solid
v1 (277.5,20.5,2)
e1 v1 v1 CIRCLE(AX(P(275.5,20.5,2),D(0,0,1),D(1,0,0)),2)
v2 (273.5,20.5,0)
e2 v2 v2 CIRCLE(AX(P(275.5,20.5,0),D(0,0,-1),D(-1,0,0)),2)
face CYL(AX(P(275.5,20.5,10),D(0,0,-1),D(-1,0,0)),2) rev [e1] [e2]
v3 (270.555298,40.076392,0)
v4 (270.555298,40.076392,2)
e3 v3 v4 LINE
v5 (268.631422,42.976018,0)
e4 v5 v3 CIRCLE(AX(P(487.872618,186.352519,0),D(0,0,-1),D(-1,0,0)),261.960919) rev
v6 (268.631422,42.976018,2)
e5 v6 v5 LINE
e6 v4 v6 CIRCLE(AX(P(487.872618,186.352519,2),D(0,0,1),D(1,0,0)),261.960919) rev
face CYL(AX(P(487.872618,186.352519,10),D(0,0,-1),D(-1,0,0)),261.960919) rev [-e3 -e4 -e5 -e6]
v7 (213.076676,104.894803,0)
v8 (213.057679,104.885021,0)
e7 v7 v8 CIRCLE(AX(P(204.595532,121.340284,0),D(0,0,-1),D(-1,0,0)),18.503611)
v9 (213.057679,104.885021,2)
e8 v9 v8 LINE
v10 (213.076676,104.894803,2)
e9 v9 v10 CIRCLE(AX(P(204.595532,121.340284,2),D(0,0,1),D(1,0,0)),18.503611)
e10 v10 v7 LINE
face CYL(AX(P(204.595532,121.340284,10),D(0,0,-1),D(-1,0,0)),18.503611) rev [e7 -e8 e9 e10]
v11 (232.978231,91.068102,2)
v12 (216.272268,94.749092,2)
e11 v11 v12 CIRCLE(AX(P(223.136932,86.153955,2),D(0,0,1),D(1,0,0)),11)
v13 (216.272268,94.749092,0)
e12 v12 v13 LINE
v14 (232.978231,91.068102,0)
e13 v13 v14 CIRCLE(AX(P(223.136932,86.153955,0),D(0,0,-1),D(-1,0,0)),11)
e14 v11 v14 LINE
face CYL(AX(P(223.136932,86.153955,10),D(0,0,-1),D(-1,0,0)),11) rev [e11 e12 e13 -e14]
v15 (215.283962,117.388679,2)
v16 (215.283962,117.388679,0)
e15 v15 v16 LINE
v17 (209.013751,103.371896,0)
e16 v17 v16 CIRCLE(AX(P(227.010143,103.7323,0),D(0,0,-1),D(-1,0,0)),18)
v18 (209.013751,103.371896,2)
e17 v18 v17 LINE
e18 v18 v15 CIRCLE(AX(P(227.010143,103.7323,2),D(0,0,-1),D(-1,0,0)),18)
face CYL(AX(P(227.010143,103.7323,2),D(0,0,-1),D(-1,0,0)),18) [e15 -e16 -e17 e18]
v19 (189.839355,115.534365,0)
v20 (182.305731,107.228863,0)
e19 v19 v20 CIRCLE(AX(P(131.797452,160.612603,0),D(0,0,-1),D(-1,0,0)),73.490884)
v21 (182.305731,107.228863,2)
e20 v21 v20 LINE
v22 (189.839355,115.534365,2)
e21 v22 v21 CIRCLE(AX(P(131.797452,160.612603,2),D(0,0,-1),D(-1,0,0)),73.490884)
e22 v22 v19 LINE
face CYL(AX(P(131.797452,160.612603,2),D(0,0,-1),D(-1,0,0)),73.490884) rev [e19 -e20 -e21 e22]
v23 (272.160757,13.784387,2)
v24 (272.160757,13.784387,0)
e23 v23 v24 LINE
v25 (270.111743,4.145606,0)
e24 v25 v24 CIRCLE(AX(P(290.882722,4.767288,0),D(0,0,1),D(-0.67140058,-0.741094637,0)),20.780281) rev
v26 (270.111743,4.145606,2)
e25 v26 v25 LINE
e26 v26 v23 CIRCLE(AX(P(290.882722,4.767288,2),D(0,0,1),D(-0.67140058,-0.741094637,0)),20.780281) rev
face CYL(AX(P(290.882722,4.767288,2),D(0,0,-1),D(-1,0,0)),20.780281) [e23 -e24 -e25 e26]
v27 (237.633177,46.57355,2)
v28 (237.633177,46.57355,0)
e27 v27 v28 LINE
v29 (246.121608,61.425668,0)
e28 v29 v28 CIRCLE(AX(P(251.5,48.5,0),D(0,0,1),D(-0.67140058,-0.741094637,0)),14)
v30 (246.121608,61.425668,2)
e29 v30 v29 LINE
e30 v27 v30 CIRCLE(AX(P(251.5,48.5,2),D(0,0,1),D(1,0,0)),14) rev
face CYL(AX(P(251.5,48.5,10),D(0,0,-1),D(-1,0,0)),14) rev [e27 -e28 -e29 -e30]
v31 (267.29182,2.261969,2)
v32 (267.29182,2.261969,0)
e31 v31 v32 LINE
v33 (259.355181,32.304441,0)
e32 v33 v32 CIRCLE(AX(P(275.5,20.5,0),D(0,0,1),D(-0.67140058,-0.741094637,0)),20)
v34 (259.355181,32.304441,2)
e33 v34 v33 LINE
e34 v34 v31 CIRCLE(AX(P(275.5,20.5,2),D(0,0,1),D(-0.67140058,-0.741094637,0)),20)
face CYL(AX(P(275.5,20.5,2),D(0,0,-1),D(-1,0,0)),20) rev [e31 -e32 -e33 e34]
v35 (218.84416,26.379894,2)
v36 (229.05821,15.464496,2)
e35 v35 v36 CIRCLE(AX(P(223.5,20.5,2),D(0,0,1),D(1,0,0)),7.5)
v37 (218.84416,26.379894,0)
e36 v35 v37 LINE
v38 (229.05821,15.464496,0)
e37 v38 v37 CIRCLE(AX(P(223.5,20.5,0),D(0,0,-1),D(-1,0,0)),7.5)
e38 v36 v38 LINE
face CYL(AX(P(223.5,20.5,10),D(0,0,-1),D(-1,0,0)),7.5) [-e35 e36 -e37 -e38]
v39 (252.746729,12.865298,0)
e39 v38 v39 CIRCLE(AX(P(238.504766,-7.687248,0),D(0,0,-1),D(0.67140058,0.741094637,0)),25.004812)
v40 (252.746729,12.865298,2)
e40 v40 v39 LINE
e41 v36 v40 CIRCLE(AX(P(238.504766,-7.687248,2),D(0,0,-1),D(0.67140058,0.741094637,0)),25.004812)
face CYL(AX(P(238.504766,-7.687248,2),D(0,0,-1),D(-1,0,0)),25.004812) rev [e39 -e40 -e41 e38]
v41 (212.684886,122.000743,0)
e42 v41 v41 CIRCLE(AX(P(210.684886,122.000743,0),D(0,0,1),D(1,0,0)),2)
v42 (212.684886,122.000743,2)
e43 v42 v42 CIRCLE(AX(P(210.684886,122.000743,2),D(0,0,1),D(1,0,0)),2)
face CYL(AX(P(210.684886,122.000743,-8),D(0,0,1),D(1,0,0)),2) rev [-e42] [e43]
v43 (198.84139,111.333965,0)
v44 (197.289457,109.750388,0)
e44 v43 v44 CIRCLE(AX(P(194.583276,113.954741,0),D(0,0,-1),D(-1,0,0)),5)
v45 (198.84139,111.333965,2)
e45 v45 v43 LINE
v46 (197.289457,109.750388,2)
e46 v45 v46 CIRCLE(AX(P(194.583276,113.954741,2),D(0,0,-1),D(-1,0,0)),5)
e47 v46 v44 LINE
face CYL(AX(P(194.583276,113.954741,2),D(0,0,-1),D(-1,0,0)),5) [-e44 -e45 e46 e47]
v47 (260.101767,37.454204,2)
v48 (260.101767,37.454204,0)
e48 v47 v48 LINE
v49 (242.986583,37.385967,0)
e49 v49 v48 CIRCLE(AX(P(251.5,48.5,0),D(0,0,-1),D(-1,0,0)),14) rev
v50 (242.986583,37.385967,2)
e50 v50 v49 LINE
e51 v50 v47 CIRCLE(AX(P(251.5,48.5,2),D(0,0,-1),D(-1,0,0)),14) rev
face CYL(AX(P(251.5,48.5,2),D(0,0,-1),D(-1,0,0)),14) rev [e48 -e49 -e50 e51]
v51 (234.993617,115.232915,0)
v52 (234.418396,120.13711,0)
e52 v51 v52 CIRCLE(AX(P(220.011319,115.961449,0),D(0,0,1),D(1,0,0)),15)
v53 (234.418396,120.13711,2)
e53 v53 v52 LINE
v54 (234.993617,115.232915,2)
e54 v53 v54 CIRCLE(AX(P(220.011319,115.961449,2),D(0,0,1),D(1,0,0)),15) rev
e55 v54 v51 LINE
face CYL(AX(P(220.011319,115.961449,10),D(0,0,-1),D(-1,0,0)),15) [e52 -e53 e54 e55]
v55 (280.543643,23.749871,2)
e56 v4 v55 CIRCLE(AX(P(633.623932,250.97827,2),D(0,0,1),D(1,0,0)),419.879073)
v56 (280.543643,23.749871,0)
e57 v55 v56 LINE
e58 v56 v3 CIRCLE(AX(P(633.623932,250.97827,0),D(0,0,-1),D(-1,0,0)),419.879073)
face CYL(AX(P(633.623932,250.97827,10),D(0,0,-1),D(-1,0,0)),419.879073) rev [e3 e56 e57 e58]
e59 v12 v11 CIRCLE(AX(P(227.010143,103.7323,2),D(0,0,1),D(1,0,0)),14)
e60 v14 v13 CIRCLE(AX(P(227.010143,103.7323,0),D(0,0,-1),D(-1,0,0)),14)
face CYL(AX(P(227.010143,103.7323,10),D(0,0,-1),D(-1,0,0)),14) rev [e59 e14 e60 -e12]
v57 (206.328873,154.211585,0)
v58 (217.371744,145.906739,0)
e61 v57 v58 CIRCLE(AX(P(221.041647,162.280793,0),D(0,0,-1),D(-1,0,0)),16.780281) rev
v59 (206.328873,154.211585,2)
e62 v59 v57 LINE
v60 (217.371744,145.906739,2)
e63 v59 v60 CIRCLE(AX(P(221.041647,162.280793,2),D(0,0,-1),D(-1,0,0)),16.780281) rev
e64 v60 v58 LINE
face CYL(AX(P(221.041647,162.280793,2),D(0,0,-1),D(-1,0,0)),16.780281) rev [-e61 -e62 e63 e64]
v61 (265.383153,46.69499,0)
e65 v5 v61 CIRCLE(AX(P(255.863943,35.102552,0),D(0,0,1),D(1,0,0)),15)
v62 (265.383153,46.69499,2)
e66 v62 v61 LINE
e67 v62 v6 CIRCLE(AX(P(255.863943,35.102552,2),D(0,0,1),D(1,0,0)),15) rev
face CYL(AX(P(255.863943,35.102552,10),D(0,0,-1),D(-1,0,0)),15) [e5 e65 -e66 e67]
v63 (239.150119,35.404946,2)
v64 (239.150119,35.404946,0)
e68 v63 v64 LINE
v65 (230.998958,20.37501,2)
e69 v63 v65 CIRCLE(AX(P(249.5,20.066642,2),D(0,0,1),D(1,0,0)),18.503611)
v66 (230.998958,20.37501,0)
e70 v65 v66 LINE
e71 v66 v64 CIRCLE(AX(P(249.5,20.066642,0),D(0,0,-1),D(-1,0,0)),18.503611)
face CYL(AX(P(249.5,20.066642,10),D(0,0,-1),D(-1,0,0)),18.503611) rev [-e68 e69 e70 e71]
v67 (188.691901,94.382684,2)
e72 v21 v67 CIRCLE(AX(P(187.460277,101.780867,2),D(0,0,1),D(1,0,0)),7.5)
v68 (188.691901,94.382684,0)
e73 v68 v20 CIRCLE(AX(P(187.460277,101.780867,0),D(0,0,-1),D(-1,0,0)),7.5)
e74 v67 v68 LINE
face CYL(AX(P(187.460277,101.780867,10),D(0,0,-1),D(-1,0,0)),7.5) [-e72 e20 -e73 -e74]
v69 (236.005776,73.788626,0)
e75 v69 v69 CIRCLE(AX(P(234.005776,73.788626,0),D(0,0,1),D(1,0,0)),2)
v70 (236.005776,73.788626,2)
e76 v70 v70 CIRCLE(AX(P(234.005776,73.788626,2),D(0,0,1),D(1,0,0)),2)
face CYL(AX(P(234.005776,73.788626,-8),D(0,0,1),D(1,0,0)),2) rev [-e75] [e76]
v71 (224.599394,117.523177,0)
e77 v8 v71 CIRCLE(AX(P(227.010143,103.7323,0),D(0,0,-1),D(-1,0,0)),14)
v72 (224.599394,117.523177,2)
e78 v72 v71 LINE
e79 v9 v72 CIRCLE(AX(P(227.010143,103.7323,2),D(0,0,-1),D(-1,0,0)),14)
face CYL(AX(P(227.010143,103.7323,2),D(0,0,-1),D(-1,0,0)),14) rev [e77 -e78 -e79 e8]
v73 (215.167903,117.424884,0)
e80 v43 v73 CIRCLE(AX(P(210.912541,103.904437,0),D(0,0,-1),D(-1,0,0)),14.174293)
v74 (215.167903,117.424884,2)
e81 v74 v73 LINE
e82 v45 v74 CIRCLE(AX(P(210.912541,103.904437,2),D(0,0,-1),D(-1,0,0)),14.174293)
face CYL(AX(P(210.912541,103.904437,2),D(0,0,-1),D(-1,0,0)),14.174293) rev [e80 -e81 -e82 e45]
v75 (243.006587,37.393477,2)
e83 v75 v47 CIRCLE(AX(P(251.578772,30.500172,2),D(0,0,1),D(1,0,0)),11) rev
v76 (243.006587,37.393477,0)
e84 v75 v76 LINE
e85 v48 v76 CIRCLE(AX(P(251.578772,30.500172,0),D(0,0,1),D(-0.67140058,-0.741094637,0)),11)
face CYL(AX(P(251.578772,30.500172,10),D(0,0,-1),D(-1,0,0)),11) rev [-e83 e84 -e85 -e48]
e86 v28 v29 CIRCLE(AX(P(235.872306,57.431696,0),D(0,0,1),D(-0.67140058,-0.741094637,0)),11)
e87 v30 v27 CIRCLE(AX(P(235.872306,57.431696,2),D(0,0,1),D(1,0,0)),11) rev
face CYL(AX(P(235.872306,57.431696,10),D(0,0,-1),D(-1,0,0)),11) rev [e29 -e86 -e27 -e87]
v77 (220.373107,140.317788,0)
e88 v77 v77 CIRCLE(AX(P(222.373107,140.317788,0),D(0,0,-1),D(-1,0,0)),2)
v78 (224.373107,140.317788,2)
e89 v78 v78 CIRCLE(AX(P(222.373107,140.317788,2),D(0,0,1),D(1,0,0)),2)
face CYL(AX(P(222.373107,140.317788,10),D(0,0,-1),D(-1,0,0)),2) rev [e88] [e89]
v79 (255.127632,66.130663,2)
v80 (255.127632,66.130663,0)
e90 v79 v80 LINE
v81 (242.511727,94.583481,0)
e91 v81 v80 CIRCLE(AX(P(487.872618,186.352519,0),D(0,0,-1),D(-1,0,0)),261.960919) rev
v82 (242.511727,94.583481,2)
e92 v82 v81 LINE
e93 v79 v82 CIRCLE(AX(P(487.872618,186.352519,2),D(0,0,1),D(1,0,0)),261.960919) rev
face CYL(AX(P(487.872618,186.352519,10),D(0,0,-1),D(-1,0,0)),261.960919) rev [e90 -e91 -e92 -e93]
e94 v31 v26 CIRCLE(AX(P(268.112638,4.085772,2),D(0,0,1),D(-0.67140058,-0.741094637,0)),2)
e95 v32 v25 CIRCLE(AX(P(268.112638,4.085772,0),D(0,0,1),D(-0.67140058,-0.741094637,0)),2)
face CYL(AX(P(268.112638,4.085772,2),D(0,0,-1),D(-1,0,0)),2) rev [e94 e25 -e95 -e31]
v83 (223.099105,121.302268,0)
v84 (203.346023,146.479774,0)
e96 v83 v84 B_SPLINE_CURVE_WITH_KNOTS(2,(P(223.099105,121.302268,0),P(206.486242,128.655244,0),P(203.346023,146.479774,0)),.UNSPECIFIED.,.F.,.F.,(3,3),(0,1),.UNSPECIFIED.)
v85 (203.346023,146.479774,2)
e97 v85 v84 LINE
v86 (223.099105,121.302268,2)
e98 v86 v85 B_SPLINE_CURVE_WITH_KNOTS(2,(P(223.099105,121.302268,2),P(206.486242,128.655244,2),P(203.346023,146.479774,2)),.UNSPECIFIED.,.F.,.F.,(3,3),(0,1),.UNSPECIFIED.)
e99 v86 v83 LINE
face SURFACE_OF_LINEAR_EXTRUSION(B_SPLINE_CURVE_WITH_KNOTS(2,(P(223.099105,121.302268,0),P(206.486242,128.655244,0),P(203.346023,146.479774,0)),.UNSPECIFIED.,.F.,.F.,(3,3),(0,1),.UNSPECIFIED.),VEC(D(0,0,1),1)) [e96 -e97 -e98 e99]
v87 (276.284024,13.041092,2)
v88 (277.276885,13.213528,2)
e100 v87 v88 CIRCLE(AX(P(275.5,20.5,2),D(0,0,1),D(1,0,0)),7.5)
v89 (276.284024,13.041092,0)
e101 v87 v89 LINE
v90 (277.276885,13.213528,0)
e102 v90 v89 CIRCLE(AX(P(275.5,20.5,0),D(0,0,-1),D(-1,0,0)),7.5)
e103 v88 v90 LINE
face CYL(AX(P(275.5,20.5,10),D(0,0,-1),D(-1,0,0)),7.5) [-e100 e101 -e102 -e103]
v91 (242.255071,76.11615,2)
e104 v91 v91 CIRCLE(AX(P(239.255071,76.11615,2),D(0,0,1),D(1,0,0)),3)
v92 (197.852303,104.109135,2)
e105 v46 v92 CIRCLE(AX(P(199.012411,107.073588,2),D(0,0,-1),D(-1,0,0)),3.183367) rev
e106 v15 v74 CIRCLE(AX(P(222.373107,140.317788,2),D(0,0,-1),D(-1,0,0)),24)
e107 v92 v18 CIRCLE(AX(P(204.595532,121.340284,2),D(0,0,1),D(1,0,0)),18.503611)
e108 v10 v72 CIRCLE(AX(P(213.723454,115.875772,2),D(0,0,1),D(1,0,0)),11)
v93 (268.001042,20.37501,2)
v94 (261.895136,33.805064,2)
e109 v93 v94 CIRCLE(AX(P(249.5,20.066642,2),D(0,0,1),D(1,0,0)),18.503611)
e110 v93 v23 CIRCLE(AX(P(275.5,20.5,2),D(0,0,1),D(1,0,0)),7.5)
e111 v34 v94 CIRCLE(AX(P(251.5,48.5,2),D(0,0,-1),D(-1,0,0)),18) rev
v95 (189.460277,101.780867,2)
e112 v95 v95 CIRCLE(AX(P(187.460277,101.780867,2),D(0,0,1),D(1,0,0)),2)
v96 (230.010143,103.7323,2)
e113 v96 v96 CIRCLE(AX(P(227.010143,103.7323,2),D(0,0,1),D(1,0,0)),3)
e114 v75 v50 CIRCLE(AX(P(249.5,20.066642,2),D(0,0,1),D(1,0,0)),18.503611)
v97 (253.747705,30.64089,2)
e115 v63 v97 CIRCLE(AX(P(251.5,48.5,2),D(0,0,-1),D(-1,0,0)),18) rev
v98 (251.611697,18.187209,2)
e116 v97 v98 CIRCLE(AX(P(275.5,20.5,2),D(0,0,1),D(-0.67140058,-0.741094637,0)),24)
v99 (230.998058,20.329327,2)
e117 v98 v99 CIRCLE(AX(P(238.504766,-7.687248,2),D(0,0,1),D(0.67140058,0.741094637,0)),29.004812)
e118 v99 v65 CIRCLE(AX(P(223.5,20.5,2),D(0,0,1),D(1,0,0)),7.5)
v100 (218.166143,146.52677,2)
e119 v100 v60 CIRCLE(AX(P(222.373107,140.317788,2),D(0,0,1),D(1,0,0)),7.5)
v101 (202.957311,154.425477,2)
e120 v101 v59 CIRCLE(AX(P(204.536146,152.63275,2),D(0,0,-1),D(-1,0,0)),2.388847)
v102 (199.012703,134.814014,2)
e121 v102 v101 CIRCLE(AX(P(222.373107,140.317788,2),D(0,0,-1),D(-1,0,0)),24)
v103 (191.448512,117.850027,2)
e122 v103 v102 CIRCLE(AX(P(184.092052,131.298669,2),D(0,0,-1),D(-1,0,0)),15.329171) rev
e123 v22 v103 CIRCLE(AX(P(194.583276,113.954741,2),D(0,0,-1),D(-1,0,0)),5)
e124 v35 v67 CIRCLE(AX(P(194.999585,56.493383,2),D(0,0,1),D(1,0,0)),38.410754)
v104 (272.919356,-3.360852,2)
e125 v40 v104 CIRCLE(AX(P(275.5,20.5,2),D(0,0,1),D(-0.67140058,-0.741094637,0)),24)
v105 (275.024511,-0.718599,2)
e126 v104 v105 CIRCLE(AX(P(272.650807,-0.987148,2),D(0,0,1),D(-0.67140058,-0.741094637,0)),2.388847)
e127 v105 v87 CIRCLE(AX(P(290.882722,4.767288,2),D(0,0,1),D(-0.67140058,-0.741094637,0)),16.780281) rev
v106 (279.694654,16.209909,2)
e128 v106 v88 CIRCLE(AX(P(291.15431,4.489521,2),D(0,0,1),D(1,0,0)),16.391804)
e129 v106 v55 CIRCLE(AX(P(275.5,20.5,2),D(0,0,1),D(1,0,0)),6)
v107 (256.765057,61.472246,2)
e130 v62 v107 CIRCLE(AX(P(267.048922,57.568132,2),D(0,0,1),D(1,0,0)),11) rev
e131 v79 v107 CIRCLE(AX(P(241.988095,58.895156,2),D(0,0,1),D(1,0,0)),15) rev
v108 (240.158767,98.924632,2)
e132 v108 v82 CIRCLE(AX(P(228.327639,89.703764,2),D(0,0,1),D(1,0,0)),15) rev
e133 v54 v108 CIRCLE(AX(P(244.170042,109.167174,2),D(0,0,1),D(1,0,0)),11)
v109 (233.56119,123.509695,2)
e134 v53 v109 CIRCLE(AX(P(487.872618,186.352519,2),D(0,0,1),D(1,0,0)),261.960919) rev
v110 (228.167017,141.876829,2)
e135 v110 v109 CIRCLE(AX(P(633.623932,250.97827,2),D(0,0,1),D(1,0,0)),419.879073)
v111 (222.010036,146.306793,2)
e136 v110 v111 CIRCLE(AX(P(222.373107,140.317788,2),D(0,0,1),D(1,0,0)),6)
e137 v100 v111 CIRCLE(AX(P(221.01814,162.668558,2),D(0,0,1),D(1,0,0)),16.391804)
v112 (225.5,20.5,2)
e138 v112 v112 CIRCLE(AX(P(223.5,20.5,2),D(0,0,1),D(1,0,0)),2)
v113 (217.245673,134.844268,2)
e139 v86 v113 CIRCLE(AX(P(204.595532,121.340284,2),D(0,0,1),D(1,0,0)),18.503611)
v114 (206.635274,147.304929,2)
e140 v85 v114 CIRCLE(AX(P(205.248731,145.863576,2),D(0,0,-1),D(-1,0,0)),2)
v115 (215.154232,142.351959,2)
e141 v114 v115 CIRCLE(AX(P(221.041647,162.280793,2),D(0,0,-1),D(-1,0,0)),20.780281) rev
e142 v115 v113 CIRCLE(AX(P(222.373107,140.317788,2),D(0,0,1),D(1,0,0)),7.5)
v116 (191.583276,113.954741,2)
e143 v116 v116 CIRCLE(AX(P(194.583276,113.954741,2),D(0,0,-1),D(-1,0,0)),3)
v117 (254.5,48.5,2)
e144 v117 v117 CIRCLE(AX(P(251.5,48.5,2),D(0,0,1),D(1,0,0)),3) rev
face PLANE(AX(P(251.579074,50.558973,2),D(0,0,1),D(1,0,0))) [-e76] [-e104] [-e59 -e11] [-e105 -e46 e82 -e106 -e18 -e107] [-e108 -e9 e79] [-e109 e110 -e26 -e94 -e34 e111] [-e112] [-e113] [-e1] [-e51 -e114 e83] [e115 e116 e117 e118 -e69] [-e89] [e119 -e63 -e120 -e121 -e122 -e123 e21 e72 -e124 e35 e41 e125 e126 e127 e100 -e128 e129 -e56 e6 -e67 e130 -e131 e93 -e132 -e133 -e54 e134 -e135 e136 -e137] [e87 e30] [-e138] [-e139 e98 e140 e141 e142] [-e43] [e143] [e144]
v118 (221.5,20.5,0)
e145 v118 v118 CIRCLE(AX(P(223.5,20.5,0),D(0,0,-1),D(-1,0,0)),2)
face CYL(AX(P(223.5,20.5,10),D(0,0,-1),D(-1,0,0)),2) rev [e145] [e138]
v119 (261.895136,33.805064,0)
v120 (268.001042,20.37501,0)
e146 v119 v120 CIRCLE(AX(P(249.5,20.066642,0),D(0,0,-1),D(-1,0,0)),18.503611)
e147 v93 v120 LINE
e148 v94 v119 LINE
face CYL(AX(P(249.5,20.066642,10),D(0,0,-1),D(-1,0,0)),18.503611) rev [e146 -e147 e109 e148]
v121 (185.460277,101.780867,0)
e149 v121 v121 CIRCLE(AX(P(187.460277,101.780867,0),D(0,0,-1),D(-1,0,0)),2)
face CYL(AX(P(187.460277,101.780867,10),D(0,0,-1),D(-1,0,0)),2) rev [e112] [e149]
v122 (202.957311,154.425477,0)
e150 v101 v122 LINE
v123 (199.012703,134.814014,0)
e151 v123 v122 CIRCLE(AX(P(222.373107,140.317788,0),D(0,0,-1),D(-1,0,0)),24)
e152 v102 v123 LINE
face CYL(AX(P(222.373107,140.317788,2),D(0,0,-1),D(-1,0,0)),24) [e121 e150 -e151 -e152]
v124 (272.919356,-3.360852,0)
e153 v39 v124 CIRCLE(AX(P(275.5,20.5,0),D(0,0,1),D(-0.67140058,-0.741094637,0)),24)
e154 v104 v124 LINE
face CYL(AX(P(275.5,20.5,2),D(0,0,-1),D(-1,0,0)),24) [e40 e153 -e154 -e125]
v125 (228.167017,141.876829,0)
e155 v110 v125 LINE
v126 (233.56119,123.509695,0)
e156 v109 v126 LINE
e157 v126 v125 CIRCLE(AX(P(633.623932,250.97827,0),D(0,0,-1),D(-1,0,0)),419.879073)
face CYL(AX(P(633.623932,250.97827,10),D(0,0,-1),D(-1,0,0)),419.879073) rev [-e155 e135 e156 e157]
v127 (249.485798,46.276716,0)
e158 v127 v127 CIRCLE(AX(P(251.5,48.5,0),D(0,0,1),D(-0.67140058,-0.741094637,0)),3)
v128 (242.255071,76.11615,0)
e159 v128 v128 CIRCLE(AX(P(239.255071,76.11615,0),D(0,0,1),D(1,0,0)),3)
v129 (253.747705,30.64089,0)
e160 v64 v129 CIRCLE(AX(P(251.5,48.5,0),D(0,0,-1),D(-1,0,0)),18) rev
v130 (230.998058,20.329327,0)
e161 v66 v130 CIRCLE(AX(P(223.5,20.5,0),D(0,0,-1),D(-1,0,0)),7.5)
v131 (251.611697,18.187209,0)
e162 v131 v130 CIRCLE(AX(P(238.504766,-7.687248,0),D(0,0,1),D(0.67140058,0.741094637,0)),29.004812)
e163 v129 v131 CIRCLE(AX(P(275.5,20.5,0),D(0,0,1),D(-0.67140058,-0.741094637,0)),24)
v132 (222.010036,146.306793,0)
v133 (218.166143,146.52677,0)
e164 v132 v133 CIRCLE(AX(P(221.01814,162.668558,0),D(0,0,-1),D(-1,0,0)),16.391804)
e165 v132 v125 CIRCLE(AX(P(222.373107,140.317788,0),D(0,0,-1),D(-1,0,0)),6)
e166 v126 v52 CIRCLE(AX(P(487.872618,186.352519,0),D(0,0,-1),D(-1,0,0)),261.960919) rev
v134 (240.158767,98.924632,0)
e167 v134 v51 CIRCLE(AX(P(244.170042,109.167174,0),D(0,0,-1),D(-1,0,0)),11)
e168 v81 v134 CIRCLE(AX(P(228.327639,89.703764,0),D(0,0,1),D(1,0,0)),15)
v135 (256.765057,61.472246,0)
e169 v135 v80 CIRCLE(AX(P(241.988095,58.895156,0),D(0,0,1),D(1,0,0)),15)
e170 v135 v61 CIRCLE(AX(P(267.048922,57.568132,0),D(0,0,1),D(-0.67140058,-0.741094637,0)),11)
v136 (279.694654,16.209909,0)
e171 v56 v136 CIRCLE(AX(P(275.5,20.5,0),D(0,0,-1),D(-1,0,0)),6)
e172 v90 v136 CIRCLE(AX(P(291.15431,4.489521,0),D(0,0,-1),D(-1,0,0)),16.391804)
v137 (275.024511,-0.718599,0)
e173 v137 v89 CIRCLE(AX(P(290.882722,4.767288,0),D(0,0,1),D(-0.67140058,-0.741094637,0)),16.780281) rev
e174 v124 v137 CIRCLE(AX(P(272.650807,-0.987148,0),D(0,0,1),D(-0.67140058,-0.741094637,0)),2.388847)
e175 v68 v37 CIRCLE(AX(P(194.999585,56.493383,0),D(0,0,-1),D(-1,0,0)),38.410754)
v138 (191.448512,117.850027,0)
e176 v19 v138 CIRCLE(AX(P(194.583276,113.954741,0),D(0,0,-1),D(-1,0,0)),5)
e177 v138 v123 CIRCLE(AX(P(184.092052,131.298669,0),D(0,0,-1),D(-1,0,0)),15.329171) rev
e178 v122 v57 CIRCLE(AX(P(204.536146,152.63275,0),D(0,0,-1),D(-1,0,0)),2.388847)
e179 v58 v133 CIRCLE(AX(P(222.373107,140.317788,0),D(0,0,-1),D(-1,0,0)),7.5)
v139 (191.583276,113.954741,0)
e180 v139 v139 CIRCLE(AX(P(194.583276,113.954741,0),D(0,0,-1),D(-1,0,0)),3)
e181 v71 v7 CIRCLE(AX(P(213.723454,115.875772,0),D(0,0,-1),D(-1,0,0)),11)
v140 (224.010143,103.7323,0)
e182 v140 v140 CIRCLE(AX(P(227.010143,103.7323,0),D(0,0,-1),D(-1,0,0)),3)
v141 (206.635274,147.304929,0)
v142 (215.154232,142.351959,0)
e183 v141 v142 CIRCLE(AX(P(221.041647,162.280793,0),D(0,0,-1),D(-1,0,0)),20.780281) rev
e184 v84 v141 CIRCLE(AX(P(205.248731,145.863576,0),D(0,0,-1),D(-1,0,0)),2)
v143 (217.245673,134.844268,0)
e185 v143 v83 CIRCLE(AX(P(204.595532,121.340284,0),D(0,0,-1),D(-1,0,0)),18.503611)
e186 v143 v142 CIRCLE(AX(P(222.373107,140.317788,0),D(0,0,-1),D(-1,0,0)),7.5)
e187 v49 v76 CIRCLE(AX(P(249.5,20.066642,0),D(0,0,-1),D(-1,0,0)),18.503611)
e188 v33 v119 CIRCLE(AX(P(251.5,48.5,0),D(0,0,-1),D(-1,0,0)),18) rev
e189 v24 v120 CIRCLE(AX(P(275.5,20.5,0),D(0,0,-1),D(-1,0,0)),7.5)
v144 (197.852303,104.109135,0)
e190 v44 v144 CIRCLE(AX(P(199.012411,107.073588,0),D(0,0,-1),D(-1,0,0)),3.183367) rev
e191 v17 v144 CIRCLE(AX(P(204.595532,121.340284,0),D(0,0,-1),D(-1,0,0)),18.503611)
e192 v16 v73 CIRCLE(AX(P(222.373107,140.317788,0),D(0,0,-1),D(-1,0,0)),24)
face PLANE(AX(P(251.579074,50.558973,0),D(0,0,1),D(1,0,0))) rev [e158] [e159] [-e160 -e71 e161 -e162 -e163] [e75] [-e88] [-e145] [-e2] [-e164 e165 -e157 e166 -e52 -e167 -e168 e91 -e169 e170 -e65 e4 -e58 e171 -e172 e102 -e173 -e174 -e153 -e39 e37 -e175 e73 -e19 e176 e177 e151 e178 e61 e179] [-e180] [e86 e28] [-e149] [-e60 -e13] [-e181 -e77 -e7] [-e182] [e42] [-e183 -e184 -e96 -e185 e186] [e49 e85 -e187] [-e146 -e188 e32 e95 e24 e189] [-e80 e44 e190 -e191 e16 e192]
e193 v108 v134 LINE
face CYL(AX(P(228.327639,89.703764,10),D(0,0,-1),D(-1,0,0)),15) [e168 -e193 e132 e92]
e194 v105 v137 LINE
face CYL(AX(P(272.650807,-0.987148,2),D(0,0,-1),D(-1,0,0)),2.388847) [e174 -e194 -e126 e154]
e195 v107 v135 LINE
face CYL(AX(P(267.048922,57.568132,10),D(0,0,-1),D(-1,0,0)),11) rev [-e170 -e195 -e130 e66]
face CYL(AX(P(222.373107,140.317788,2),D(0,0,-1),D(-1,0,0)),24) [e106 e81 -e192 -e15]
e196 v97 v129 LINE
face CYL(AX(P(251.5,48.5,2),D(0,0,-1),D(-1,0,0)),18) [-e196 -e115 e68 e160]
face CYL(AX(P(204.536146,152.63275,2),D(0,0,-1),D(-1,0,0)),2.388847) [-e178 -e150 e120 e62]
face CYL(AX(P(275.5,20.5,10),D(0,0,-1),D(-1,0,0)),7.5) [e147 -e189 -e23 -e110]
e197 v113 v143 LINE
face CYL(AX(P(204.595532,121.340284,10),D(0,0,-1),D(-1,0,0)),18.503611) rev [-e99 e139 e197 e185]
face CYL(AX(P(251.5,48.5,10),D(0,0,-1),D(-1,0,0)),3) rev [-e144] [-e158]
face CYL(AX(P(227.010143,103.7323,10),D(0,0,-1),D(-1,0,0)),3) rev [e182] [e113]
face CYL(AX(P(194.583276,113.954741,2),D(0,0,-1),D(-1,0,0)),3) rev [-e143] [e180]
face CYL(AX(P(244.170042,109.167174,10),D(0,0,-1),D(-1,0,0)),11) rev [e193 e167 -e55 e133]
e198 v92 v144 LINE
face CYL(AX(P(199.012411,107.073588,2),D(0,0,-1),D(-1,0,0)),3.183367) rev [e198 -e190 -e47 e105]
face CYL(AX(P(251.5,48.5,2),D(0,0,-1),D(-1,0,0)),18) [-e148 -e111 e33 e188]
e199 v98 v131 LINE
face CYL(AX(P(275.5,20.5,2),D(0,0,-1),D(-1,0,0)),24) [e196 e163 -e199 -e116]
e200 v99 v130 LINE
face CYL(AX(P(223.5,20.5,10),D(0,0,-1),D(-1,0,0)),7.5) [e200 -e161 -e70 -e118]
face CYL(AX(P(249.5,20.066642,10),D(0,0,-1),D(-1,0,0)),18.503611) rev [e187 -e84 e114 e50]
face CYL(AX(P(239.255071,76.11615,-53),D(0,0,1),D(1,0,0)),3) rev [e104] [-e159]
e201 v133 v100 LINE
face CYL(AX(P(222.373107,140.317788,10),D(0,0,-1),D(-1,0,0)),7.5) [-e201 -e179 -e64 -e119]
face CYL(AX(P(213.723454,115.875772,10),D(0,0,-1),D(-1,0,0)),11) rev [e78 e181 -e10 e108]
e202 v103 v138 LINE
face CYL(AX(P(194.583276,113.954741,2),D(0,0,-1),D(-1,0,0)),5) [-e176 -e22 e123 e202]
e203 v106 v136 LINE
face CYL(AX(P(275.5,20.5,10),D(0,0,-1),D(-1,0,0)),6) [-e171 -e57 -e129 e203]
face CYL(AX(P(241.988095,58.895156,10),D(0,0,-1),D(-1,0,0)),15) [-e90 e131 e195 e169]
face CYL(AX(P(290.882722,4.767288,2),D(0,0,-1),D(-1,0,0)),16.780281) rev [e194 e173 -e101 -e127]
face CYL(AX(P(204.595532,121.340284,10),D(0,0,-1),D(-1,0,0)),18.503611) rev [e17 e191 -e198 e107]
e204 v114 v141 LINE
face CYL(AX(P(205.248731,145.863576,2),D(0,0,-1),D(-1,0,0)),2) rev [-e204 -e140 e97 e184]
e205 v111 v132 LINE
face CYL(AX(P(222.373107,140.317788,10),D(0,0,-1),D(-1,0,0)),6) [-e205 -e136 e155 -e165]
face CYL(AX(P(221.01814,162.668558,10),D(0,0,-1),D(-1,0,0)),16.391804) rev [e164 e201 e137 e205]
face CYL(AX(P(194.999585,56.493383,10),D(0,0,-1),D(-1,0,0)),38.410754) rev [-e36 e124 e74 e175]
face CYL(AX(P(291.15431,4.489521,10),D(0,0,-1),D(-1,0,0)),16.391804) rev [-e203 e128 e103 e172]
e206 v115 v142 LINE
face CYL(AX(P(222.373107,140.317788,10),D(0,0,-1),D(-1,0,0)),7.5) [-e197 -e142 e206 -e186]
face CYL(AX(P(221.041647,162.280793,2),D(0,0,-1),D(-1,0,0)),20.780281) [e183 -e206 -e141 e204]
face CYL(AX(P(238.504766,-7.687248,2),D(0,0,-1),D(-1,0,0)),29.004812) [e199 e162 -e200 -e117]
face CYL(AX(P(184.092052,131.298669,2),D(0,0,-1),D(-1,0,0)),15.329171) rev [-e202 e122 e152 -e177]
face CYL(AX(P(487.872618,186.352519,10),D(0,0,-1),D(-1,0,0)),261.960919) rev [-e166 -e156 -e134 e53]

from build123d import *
from build123d.topology import SkipClean

# Parameters (mm, degrees)
SKETCH1_R            = 1.8
SKETCH1_R_2          = 2.75
EXTRUDE2_DEPTH       = 2
EXTRUDE3_START       = -2
EXTRUDE3_DEPTH       = 2
EXTRUDE4_DEPTH       = 2
EXTRUDE5_DEPTH       = 10
SKETCH5_R            = 3
EXTRUDE6_DEPTH       = 55
BOSS_EXTRUDE2_DEPTH  = 2
CUT_EXTRUDE2_DEPTH   = 10
BOSS_EXTRUDE3_DEPTH  = 2
CUT_EXTRUDE3_DEPTH   = 10
BOSS_EXTRUDE4_DEPTH  = 2
BOSS_EXTRUDE5_DEPTH  = 2
SKETCH11_R           = 3
CUT_EXTRUDE4_DEPTH   = 10
BOSS_EXTRUDE6_DEPTH  = 2
BOSS_EXTRUDE7_DEPTH  = 2
SKETCH16_R           = 3
SKETCH16_R_2         = 2
BOSS_EXTRUDE8_DEPTH  = 2
SKETCH16_3_R         = 2
CUT_EXTRUDE5_DEPTH   = 2
SKETCH17_R           = 2
CUT_EXTRUDE6_DEPTH   = 10
CUT_EXTRUDE7_DEPTH   = 10
CUT_EXTRUDE8_START   = -2
CUT_EXTRUDE8_DEPTH   = 2
BOSS_EXTRUDE9_DEPTH  = 2
SKETCH16_4_R         = 3
CUT_EXTRUDE9_DEPTH   = 2
SKETCH22_R           = 2
CUT_EXTRUDE11_DEPTH  = 10
SKETCH22_3_R         = 2
BOSS_EXTRUDE10_DEPTH = 2


# Read off the part's stored shape, not the designer's step: Cut-Extrude8
with BuildPart() as part:
    # Sketch1 → Extrude2 (new body)
    with BuildSketch(Plane.XY):
        with BuildLine():
            Line((214.950942091, 33.616874637), (221.807190432, 36.656917184))
            Line((221.807190432, 36.656917184), (220.185834407, 40.313582966))
            Line((220.185834407, 40.313582966), (249.033490074, 53.104557885))
            ThreePointArc((249.033490074, 53.104557885), (251.717229956, 54.156321533), (254.312398254, 52.901822418))
            Line((254.312398254, 52.901822418), (279.296283012, 23.753956867))
            ThreePointArc((279.296283012, 23.753956867), (280.042564492, 18.410715952), (275.5, 15.5))
            Line((275.5, 15.5), (223.5, 15.5))
            ThreePointArc((223.5, 15.5), (220.722148835, 16.342651938), (218.880602337, 18.586582838))
            Line((218.880602337, 18.586582838), (211.044169952, 36.260192904))
            Line((211.044169952, 36.260192904), (213.329586066, 37.27354042))
            Line((213.329586066, 37.27354042), (214.950942091, 33.616874637))
        make_face()
        with Locations((275.5, 20.5)):
            Circle(SKETCH1_R, mode=Mode.SUBTRACT)
        with Locations((251.5, 48.5)):
            Circle(SKETCH1_R_2, mode=Mode.SUBTRACT)
        with Locations((223.5, 20.5)):
            Circle(SKETCH1_R, mode=Mode.SUBTRACT)
    extrude(amount=EXTRUDE2_DEPTH)

    # Sketch2 → Extrude3 (add)
    with BuildSketch(Plane.XY.offset(2).offset(EXTRUDE3_START)):
        with BuildLine():
            Line((275.035821138, 64.633923334), (251.401662381, 54.15459928))
            ThreePointArc((251.401662381, 54.15459928), (253.0022869, 53.865703947), (254.312398254, 52.901822418))
            Line((254.312398254, 52.901822418), (265.867761021, 39.420565857))
            Line((265.867761021, 39.420565857), (282.872253523, 46.960313268))
            Line((282.872253523, 46.960313268), (275.035821138, 64.633923334))
        make_face()
        with BuildLine():
            Line((264.774418622, 15.5), (268.520870849, 7.050576522))
            Line((268.520870849, 7.050576522), (295.302771445, 18.925601058))
            Line((295.302771445, 18.925601058), (282.872253523, 46.960313268))
            Line((282.872253523, 46.960313268), (265.867761021, 39.420565857))
            Line((265.867761021, 39.420565857), (279.296283012, 23.753956867))
            ThreePointArc((279.296283012, 23.753956867), (280.042564492, 18.410715952), (275.5, 15.5))
            Line((275.5, 15.5), (264.774418622, 15.5))
        make_face()
        with BuildLine():
            ThreePointArc((223.5, 15.5), (222.085748932, 15.704179537), (220.787002315, 16.300042433))
            ThreePointArc((220.787002315, 16.300042433), (243.759401886, 7.058869787), (268.520870849, 7.050576522))
            Line((268.520870849, 7.050576522), (264.774418622, 15.5))
            Line((264.774418622, 15.5), (223.5, 15.5))
        make_face()
        with BuildLine():
            Line((295.302771445, 18.925601058), (268.520870849, 7.050576522))
            ThreePointArc((268.520870849, 7.050576522), (282.58749462, 11.46423343), (295.302771445, 18.925601058))
        make_face()
    extrude(amount=EXTRUDE3_DEPTH)


with BuildPart() as body_2:
    # Mirror2: mirrored copy
    add(part.part.mirror(Plane(origin=(11.104903497, -25.045036387, 0), x_dir=(0, 0, 1), z_dir=(-0.4053390061385553, 0.9141664455134023, 0))))


with BuildPart() as part_1:
    add(part.part)

    add(body_2.part)  # Extrude4 merges body 2
    # Sketch3 → Extrude4 (add)
    with BuildSketch(Plane.XY.offset(2)):
        Polygon((275.035821138, 64.633923334), (254.768870831, 110.34224561), (190.777219645, 81.96851518), (211.044169952, 36.260192904), align=None)
    extrude(amount=-EXTRUDE4_DEPTH)

    # Sketch4 → Extrude5 (cut)
    with BuildSketch(Plane.XY.offset(2)):
        Polygon((262.406775751, 78.177359931), (258.750109969, 76.556003907), (252.670024877, 90.26850059), (256.326690659, 91.889856614), align=None)
        Polygon((286.72711612, 23.327373201), (283.070450338, 21.706017176), (276.990365245, 35.418513859), (280.647031028, 37.039869883), align=None)
        Polygon((234.429769601, 131.405990638), (238.086435383, 133.027346662), (232.006350291, 146.739843345), (228.349684509, 145.11848732), align=None)
    extrude(amount=-EXTRUDE5_DEPTH, mode=Mode.SUBTRACT)

    # Sketch5 → Extrude6 (cut)
    with BuildSketch(Plane.XY.offset(2)):
        with Locations((239.255071404, 76.116150138)):
            Circle(SKETCH5_R)
    extrude(amount=-EXTRUDE6_DEPTH, mode=Mode.SUBTRACT)

    # Sketch8 → Boss-Extrude2 (add)
    with BuildSketch(Plane(origin=(0, 0, 0), x_dir=(-1, 0, 0), z_dir=(0, 0, -1))):
        Polygon((-198.724451181, 91.591049062), (-189.767325125, 87.770757271), (-210.762968813, 38.543986786), (-219.72009487, 42.364278577), align=None)
    extrude(amount=-BOSS_EXTRUDE2_DEPTH)

    # Sketch6 → Cut-Extrude2 (cut)
    with BuildSketch(Plane.XY.offset(2)):
        Polygon((215.30566699, 32.68026603), (222.161915332, 35.720308576), (220.540559307, 39.376974358), (213.684310966, 36.336931812), align=None)
    cut_extrude2 = extrude(amount=-CUT_EXTRUDE2_DEPTH, mode=Mode.SUBTRACT)

    # Mirror3: Cut-Extrude2 across plane
    add(cut_extrude2.mirror(Plane(origin=(11.104903497, -25.045036387, 0), x_dir=(0, 0, 1), z_dir=(-0.4053390061385553, 0.9141664455134023, 0))), mode=Mode.SUBTRACT)

    # Sketch7 → Boss-Extrude3 (add)
    with BuildSketch(Plane(origin=(0, 0, 0), x_dir=(-1, 0, 0), z_dir=(0, 0, -1))):
        Polygon((-211.798895028, 37.450463228), (-220.540559307, 42.086184193), (-224.569673151, 34.488410116), (-215.828008872, 29.852689152), align=None)
        Polygon((-222.161915332, 35.720308576), (-215.30566699, 32.68026603), (-213.684310966, 36.336931812), (-220.540559307, 39.376974358), align=None, mode=Mode.SUBTRACT)
    extrude(amount=-BOSS_EXTRUDE3_DEPTH)

    # Sketch9 → Cut-Extrude3 (cut)
    # profile 1 of 2: a face of its own
    with BuildSketch(Plane(origin=(0, 0, 0), x_dir=(-1, 0, 0), z_dir=(0, 0, -1))):
        with BuildLine():
            ThreePointArc((-219.146363738, 109.909757579), (-206.3092142, 102.916198704), (-192.4024525, 107.422222786))
            ThreePointArc((-192.4024525, 107.422222786), (-188.200798595, 109.244218974), (-183.723031197, 108.283404333))
            ThreePointArc((-183.723031197, 108.283404333), (-202.191395683, 139.524441278), (-234.501920524, 156.050567885))
            Line((-234.501920524, 156.050567885), (-295.302771445, 18.925601058))
            ThreePointArc((-295.302771445, 18.925601058), (-261.362042522, 6.076095375), (-225.809806958, 13.364539832))
            ThreePointArc((-225.809806958, 13.364539832), (-229.528237165, 16.037897729), (-230.998958431, 20.375010202))
            ThreePointArc((-230.998958431, 20.375010202), (-236.996576126, 33.706583992), (-250.798334924, 38.524647068))
            ThreePointArc((-250.798334924, 38.524647068), (-262.929674492, 32.795643116), (-268.001041569, 20.375010202))
            ThreePointArc((-268.001041569, 20.375010202), (-276.541032207, 13.072601267), (-282.744361441, 22.441449797))
            Line((-282.744361441, 22.441449797), (-283.070450338, 21.706017176))
            Line((-283.070450338, 21.706017176), (-286.72711612, 23.327373201))
            Line((-286.72711612, 23.327373201), (-280.647031028, 37.039869883))
            Line((-280.647031028, 37.039869883), (-276.990365245, 35.418513859))
            Line((-276.990365245, 35.418513859), (-281.802666507, 24.565266892))
            ThreePointArc((-281.802666507, 24.565266892), (-281.613064316, 24.845163365), (-281.411041354, 25.116231158))
            ThreePointArc((-281.411041354, 25.116231158), (-263.21115929, 51.627791867), (-248.39673574, 80.169540469))
            ThreePointArc((-248.39673574, 80.169540469), (-237.191011643, 110.311376626), (-229.762847648, 141.599088576))
            ThreePointArc((-229.762847648, 141.599088576), (-229.697599093, 141.930801784), (-229.617468339, 142.259237605))
            Line((-229.617468339, 142.259237605), (-234.429769601, 131.405990638))
            Line((-234.429769601, 131.405990638), (-238.086435383, 133.027346662))
            Line((-238.086435383, 133.027346662), (-232.006350291, 146.739843345))
            Line((-232.006350291, 146.739843345), (-228.349684509, 145.11848732))
            Line((-228.349684509, 145.11848732), (-228.675773406, 144.3830547))
            ThreePointArc((-228.675773406, 144.3830547), (-220.254144747, 147.512230066), (-214.873106899, 140.317787808))
            ThreePointArc((-214.873106899, 140.317787808), (-215.491764103, 137.334983534), (-217.245672588, 134.844268155))
            ThreePointArc((-217.245672588, 134.844268155), (-223.045618241, 122.746684929), (-219.146363738, 109.909757579))
        make_face()
        Polygon((-252.670024877, 90.26850059), (-258.750109969, 76.556003907), (-262.406775751, 78.177359931), (-256.326690659, 91.889856614), align=None, mode=Mode.SUBTRACT)
    # profile 2 of 2: a face of its own
    with BuildSketch(Plane(origin=(0, 0, 0), x_dir=(-1, 0, 0), z_dir=(0, 0, -1))):
        with BuildLine():
            ThreePointArc((-185.157297666, 94.64319988), (-186.908989848, 94.301155277), (-188.691901235, 94.382684405))
            ThreePointArc((-188.691901235, 94.382684405), (-213.220264161, 90.307475736), (-230.113406869, 72.062760256))
            ThreePointArc((-230.113406869, 72.062760256), (-232.292402054, 47.293830066), (-218.844160197, 26.379894193))
            ThreePointArc((-218.844160197, 26.379894193), (-217.586691658, 25.113326831), (-216.664091931, 23.585508204))
            Line((-216.664091931, 23.585508204), (-185.157297666, 94.64319988))
        make_face()
        Polygon((-215.30566699, 32.68026603), (-222.161915332, 35.720308576), (-220.540559307, 39.376974358), (-213.684310966, 36.336931812), align=None, mode=Mode.SUBTRACT)
        Polygon((-197.841574963, 90.570295307), (-190.985326622, 87.530252761), (-192.606682647, 83.873586979), (-199.462930988, 86.913629525), align=None, mode=Mode.SUBTRACT)
    extrude(amount=-CUT_EXTRUDE3_DEPTH, mode=Mode.SUBTRACT)

    # Sketch9<3> → Boss-Extrude4 (add)
    with SkipClean():  # the faces are left unmerged after this step: merging them gives an invalid solid
        with BuildSketch(Plane(origin=(0, 0, 0), x_dir=(-1, 0, 0), z_dir=(0, 0, -1))):
            with BuildLine():
                ThreePointArc((-179.960276728, 101.780866687), (-180.968769142, 105.537238508), (-183.723031197, 108.283404333))
                ThreePointArc((-183.723031197, 108.283404333), (-183.061079526, 105.450124932), (-182.526202408, 102.590132162))
                ThreePointArc((-182.526202408, 102.590132162), (-182.508998785, 101.084557319), (-182.94078726, 99.642125246))
                Line((-182.94078726, 99.642125246), (-185.157297666, 94.64319988))
                ThreePointArc((-185.157297666, 94.64319988), (-181.397177563, 97.366251356), (-179.960276728, 101.780866687))
            make_face()
            with BuildLine():
                ThreePointArc((-216, 20.5), (-216.167902397, 22.078082616), (-216.664091931, 23.585508204))
                Line((-216.664091931, 23.585508204), (-218.880602337, 18.586582838))
                ThreePointArc((-218.880602337, 18.586582838), (-219.659677978, 17.298136985), (-220.787001942, 16.300042674))
                ThreePointArc((-220.787001942, 16.300042674), (-223.265644053, 14.776236432), (-225.809806958, 13.364539832))
                ThreePointArc((-225.809806958, 13.364539832), (-219.088285605, 14.434789691), (-216, 20.5))
            make_face()
        extrude(amount=-BOSS_EXTRUDE4_DEPTH)

    # Sketch10 → Boss-Extrude5 (add)
    with SkipClean():  # the faces are left unmerged after this step: merging them gives an invalid solid
        with BuildSketch(Plane(origin=(0, 0, 0), x_dir=(-1, 0, 0), z_dir=(0, 0, -1))):
            with BuildLine():
                ThreePointArc((-235.958744639, 114.499032615), (-240.356731212, 107.959424354), (-240.525431642, 100.080318931))
                ThreePointArc((-240.525431642, 100.080318931), (-240.529519907, 96.974501167), (-242.511726994, 94.58348135))
                ThreePointArc((-242.511726994, 94.58348135), (-244.170042184, 109.167174091), (-234.418395851, 120.137110145))
                ThreePointArc((-234.418395851, 120.137110145), (-234.3000474, 117.07532284), (-235.958744639, 114.499032615))
            make_face()
            with BuildLine():
                ThreePointArc((-213.057679374, 104.885020596), (-211.080001731, 104.010099861), (-209.013751259, 103.371896019))
                ThreePointArc((-209.013751259, 103.371896019), (-212.855340343, 114.851723245), (-223.099104635, 121.302268415))
                ThreePointArc((-223.099104635, 121.302268415), (-222.968296994, 119.143661337), (-222.586531621, 117.015058425))
                ThreePointArc((-222.586531621, 117.015058425), (-216.000852002, 112.380740363), (-213.057679374, 104.885020596))
            make_face()
            with BuildLine():
                ThreePointArc((-239.150118611, 35.404946366), (-241.010369821, 36.507743079), (-242.986582803, 37.385967085))
                ThreePointArc((-242.986582803, 37.385967085), (-250.517668332, 34.534505934), (-258.373765711, 36.303633945))
                ThreePointArc((-258.373765711, 36.303633945), (-260.207579406, 35.157412985), (-261.895135861, 33.805063782))
                ThreePointArc((-261.895135861, 33.805063782), (-250.237002141, 30.544364773), (-239.150118611, 35.404946366))
            make_face()
            with BuildLine():
                ThreePointArc((-268.631422006, 42.976017735), (-261.826080652, 42.099863238), (-265.487264056, 47.902970486))
                ThreePointArc((-265.487264056, 47.902970486), (-263.593606182, 55.552991529), (-257.867708976, 60.968050465))
                ThreePointArc((-257.867708976, 60.968050465), (-255.684077657, 63.117539269), (-255.127631976, 66.130663239))
                ThreePointArc((-255.127631976, 66.130663239), (-267.048922235, 57.568131966), (-268.631422006, 42.976017735))
            make_face()
        extrude(amount=-BOSS_EXTRUDE5_DEPTH)

    # Sketch11 → Cut-Extrude4 (cut)
    with SkipClean():  # the faces are left unmerged after this step: merging them gives an invalid solid
        with BuildSketch(Plane(origin=(0, 0, 0), x_dir=(-1, 0, 0), z_dir=(0, 0, -1))):
            with Locations((-227.010142808, 103.732300275)):
                Circle(SKETCH11_R)
            with BuildLine():
                ThreePointArc((-213.058581143, 104.895884011), (-216.676051769, 113.177222848), (-224.599393661, 117.52317728))
                ThreePointArc((-224.599393661, 117.52317728), (-221.843097289, 108.454761562), (-213.058581143, 104.895884011))
            make_face()
            with BuildLine():
                ThreePointArc((-216.272267555, 94.74909177), (-225.503894125, 96.89627695), (-232.978230566, 91.068101583))
                ThreePointArc((-232.978230566, 91.068101583), (-223.997645443, 90.060253625), (-216.272267555, 94.74909177))
            make_face()
            with BuildLine():
                ThreePointArc((-240.158767208, 98.924631776), (-233.68343701, 105.845862315), (-234.993616715, 115.232915232))
                ThreePointArc((-234.993616715, 115.232915232), (-240.356731212, 107.959424354), (-240.158767208, 98.924631776))
            make_face()
        cut_extrude4 = extrude(amount=-CUT_EXTRUDE4_DEPTH, mode=Mode.SUBTRACT)

    # Sketch13 → Boss-Extrude6 (add)
    with BuildSketch(Plane(origin=(0, 0, 0), x_dir=(-1, 0, 0), z_dir=(0, 0, -1))):
        with BuildLine():
            ThreePointArc((-221.016225319, 141.500527161), (-218.054735197, 141.716298083), (-215.154232385, 142.351958587))
            ThreePointArc((-215.154232385, 142.351958587), (-216.00972223, 144.28733886), (-217.371744244, 145.906738657))
            ThreePointArc((-217.371744244, 145.906738657), (-222.057051315, 145.531261724), (-226.662688019, 146.469982035))
            ThreePointArc((-226.662688019, 146.469982035), (-227.771045753, 145.524730877), (-228.675773406, 144.3830547))
            Line((-228.675773406, 144.3830547), (-229.617468339, 142.259237605))
            ThreePointArc((-229.617468339, 142.259237605), (-229.697599093, 141.930801784), (-229.762847648, 141.599088576))
            ThreePointArc((-229.762847648, 141.599088576), (-231.865618613, 130.819291514), (-234.418395851, 120.137110145))
            Line((-234.418395851, 120.137110145), (-227.995019703, 140.663401272))
            ThreePointArc((-227.995019703, 140.663401272), (-227.083713367, 141.799635698), (-225.643399707, 142.016440843))
            ThreePointArc((-225.643399707, 142.016440843), (-224.61484051, 141.810023984), (-223.577174628, 141.655779176))
            ThreePointArc((-223.577174628, 141.655779176), (-222.264185757, 142.114489281), (-221.016225319, 141.500527161))
        make_face()
        with BuildLine():
            ThreePointArc((-203.346022961, 146.479774244), (-205.604715324, 129.417281213), (-220.281674353, 120.427440654))
            ThreePointArc((-220.281674353, 120.427440654), (-217.65856338, 119.112416082), (-215.283961995, 117.388679135))
            ThreePointArc((-215.283961995, 117.388679135), (-199.601215049, 132.738807559), (-202.957311315, 154.425476558))
            ThreePointArc((-202.957311315, 154.425476558), (-204.68739073, 155.016803958), (-206.328873231, 154.211584687))
            ThreePointArc((-206.328873231, 154.211584687), (-210.955849283, 148.869807849), (-217.371744244, 145.906738657))
            ThreePointArc((-217.371744244, 145.906738657), (-216.00972223, 144.28733886), (-215.154232385, 142.351958587))
            ThreePointArc((-215.154232385, 142.351958587), (-210.596914714, 144.316170629), (-206.635274013, 147.304928943))
            ThreePointArc((-206.635274013, 147.304928943), (-204.76208278, 147.803465588), (-203.346022961, 146.479774244))
        make_face()
    boss_extrude6 = extrude(amount=-BOSS_EXTRUDE6_DEPTH)

    # Sketch14 → Boss-Extrude7 (add)
    with SkipClean():  # the faces are left unmerged after this step: merging them gives an invalid solid
        with BuildSketch(Plane(origin=(0, 0, 0), x_dir=(-1, 0, 0), z_dir=(0, 0, -1))):
            with BuildLine():
                Line((-204.620489613, 124.167104246), (-201.438511078, 128.5814043))
                ThreePointArc((-201.438511078, 128.5814043), (-196.896529827, 117.158820126), (-187.460276728, 109.280866687))
                Line((-187.460276728, 109.280866687), (-192.367992506, 107.452226827))
                ThreePointArc((-192.367992506, 107.452226827), (-200.038082842, 114.677984071), (-204.620489613, 124.167104246))
            make_face()
        boss_extrude7 = extrude(amount=-BOSS_EXTRUDE7_DEPTH)

    # Mirror5: Cut-Extrude4, Boss-Extrude6, Boss-Extrude7 across plane
    with SkipClean():  # the faces are left unmerged after this step: merging them gives an invalid solid
        add(cut_extrude4.mirror(Plane(origin=(11.104903497, -25.045036387, 0), x_dir=(0, 0, 1), z_dir=(-0.4053390061385553, 0.9141664455134023, 0))), mode=Mode.SUBTRACT)
        add(boss_extrude6.mirror(Plane(origin=(11.104903497, -25.045036387, 0), x_dir=(0, 0, 1), z_dir=(-0.4053390061385553, 0.9141664455134023, 0))))
        add(boss_extrude7.mirror(Plane(origin=(11.104903497, -25.045036387, 0), x_dir=(0, 0, 1), z_dir=(-0.4053390061385553, 0.9141664455134023, 0))))

    # Sketch16 → Boss-Extrude8 (add)
    with SkipClean():  # the faces are left unmerged after this step: merging them gives an invalid solid
        with BuildSketch(Plane(origin=(0, 0, 0), x_dir=(-1, 0, 0), z_dir=(0, 0, -1))):
            with Locations((-194.583275689, 113.954740729)):
                Circle(SKETCH16_R)
            with Locations((-194.583275689, 113.954740729)):
                Circle(SKETCH16_R_2, mode=Mode.SUBTRACT)
        extrude(amount=-BOSS_EXTRUDE8_DEPTH)

    # Sketch16<3> → Cut-Extrude5 (cut)
    with SkipClean():  # the faces are left unmerged after this step: merging them gives an invalid solid
        with BuildSketch(Plane(origin=(0, 0, 0), x_dir=(-1, 0, 0), z_dir=(0, 0, -1))):
            with Locations((-194.583275689, 113.954740729)):
                Circle(SKETCH16_3_R)
        extrude(amount=-CUT_EXTRUDE5_DEPTH, mode=Mode.SUBTRACT)

    # Sketch17 → Cut-Extrude6 (cut)
    with SkipClean():  # the faces are left unmerged after this step: merging them gives an invalid solid
        with BuildSketch(Plane(origin=(0, 0, 0), x_dir=(-1, 0, 0), z_dir=(0, 0, -1))):
            with Locations((-187.460276728, 101.780866687)):
                Circle(SKETCH17_R)
            with Locations((-222.373106899, 140.317787808)):
                Circle(SKETCH17_R)
            with Locations((-223.5, 20.5)):
                Circle(SKETCH17_R)
            with Locations((-275.5, 20.5)):
                Circle(SKETCH17_R)
        extrude(amount=-CUT_EXTRUDE6_DEPTH, mode=Mode.SUBTRACT)

    # Sketch18 → Cut-Extrude7 (cut)
    with SkipClean():  # the faces are left unmerged after this step: merging them gives an invalid solid
        with BuildSketch(Plane(origin=(0, 0, 0), x_dir=(-1, 0, 0), z_dir=(0, 0, -1))):
            with BuildLine():
                Line((-268.631422006, 42.976017735), (-277.444270288, 63.909399485))
                Line((-277.444270288, 63.909399485), (-255.127631976, 66.130663239))
                ThreePointArc((-255.127631976, 66.130663239), (-256.139347113, 63.869294952), (-256.76505671, 61.472246445))
                ThreePointArc((-256.76505671, 61.472246445), (-257.546803091, 52.026495764), (-265.383153079, 46.694990142))
                ThreePointArc((-265.383153079, 46.694990142), (-267.161368211, 44.970082901), (-268.631422006, 42.976017735))
            make_face()
            with BuildLine():
                Line((-234.418395851, 120.137110145), (-250.480120627, 122.495780878))
                Line((-250.480120627, 122.495780878), (-261.715098887, 98.301383812))
                Line((-261.715098887, 98.301383812), (-242.511726994, 94.58348135))
                ThreePointArc((-242.511726994, 94.58348135), (-241.515105214, 96.851541991), (-240.158767208, 98.924631776))
                ThreePointArc((-240.158767208, 98.924631776), (-233.68343701, 105.845862315), (-234.993616715, 115.232915232))
                ThreePointArc((-234.993616715, 115.232915232), (-234.909191881, 117.708844652), (-234.418395851, 120.137110145))
            make_face()
        extrude(amount=-CUT_EXTRUDE7_DEPTH, mode=Mode.SUBTRACT)

    # Cut-Extrude8 outline → Cut-Extrude8 (cut)
    with SkipClean():  # the faces are left unmerged after this step: merging them gives an invalid solid
        with BuildSketch(Plane(origin=(0, 0, 0), x_dir=(-1, 0, 0), z_dir=(0, 0, -1)).offset(CUT_EXTRUDE8_START)):
            with BuildLine():
                ThreePointArc((-279.694653694, 16.209909047), (-281.462322543, 19.828650694), (-280.543643076, 23.749871462))
                ThreePointArc((-280.543643076, 23.749871462), (-275.4564309, 31.856211166), (-270.555297774, 40.07639153))
                ThreePointArc((-270.555297774, 40.07639153), (-275.851180504, 32.500534336), (-281.411041354, 25.116231158))
                ThreePointArc((-281.411041354, 25.116231158), (-281.613064316, 24.845163364), (-281.802666507, 24.565266892))
                Line((-281.802666507, 24.565266892), (-282.744361441, 22.441449797))
                ThreePointArc((-282.744361441, 22.441449797), (-281.952469183, 16.676959136), (-277.276884943, 13.213527609))
                ThreePointArc((-277.276884943, 13.213527609), (-278.39748836, 14.782951896), (-279.694653694, 16.209909047))
            make_face()
            with BuildLine():
                ThreePointArc((-229.762847648, 141.599088576), (-231.50242133, 132.520880079), (-233.561189729, 123.509694875))
                ThreePointArc((-233.561189729, 123.509694875), (-230.759416419, 132.662516724), (-228.167015875, 141.876828468))
                ThreePointArc((-228.167015875, 141.876828468), (-225.877339968, 145.188142066), (-222.010036425, 146.306792719))
                ThreePointArc((-222.010036425, 146.306792719), (-220.081608576, 146.303530306), (-218.166142869, 146.5267695))
                ThreePointArc((-218.166142869, 146.5267695), (-223.872063371, 147.666469968), (-228.675773406, 144.3830547))
                Line((-228.675773406, 144.3830547), (-229.617468339, 142.259237605))
                ThreePointArc((-229.617468339, 142.259237605), (-229.697599093, 141.930801784), (-229.762847648, 141.599088576))
            make_face()
        extrude(amount=CUT_EXTRUDE8_DEPTH, mode=Mode.SUBTRACT)

    # Sketch20 → Boss-Extrude9 (add)
    with SkipClean():  # the faces are left unmerged after this step: merging them gives an invalid solid
        with BuildSketch(Plane(origin=(0, 0, 0), x_dir=(-1, 0, 0), z_dir=(0, 0, -1))):
            with BuildLine():
                ThreePointArc((-187.460276728, 109.280866687), (-184.686287803, 108.749007432), (-182.305731327, 107.228862806))
                ThreePointArc((-182.305731327, 107.228862806), (-186.231180938, 111.237719227), (-189.839354683, 115.534365207))
                ThreePointArc((-189.839354683, 115.534365207), (-190.477305487, 116.807986022), (-191.448511813, 117.850027039))
                ThreePointArc((-191.448511813, 117.850027039), (-198.092467353, 125.055925882), (-199.012702848, 134.814014321))
                ThreePointArc((-199.012702848, 134.814014321), (-200.007438782, 131.61279558), (-201.438511078, 128.5814043))
                ThreePointArc((-201.438511078, 128.5814043), (-199.700265161, 122.145954162), (-196.323461832, 116.398457608))
                ThreePointArc((-196.323461832, 116.398457608), (-192.457978423, 116.072076681), (-192.146106925, 112.20539559))
                ThreePointArc((-192.146106925, 112.20539559), (-189.884193343, 110.613346353), (-187.460276728, 109.280866687))
            make_face()
            with BuildLine():
                ThreePointArc((-197.289456843, 109.750387799), (-195.844770664, 106.757541927), (-197.852303232, 104.109135319))
                ThreePointArc((-197.852303232, 104.109135319), (-194.983556151, 105.529100064), (-192.4024525, 107.422222786))
                ThreePointArc((-192.4024525, 107.422222786), (-192.385245352, 107.437251049), (-192.367992506, 107.452226827))
                ThreePointArc((-192.367992506, 107.452226827), (-200.038082842, 114.677984071), (-204.620489613, 124.167104246))
                ThreePointArc((-204.620489613, 124.167104246), (-209.446870241, 120.096205133), (-215.167902853, 117.42488422))
                ThreePointArc((-215.167902853, 117.42488422), (-205.958102249, 117.184652604), (-198.841389813, 111.333965251))
                ThreePointArc((-198.841389813, 111.333965251), (-198.154309372, 110.455066682), (-197.289456843, 109.750387799))
            make_face()
        extrude(amount=-BOSS_EXTRUDE9_DEPTH)

    # Sketch16<4> → Cut-Extrude9 (cut)
    with SkipClean():  # the faces are left unmerged after this step: merging them gives an invalid solid
        with BuildSketch(Plane(origin=(0, 0, 0), x_dir=(-1, 0, 0), z_dir=(0, 0, -1))):
            with Locations((-194.583275689, 113.954740729)):
                Circle(SKETCH16_4_R)
        extrude(amount=-CUT_EXTRUDE9_DEPTH, mode=Mode.SUBTRACT)

    # Sketch22 → Cut-Extrude11 (cut)
    with SkipClean():  # the faces are left unmerged after this step: merging them gives an invalid solid
        with BuildSketch(Plane.XY.offset(2)):
            with Locations((210.684885935, 122.000742684)):
                Circle(SKETCH22_R)
            with Locations((234.005775534, 73.788626106)):
                Circle(SKETCH22_R)
        extrude(amount=-CUT_EXTRUDE11_DEPTH, mode=Mode.SUBTRACT)

    # Sketch22<3> → Boss-Extrude10 (add)
    with SkipClean():  # the faces are left unmerged after this step: merging them gives an invalid solid
        with BuildSketch(Plane.XY.offset(2)):
            with BuildLine():
                Line((223.099104635, 121.302268415), (218.334856534, 118.070158091))
                Line((218.334856534, 118.070158091), (213.798003088, 120.401211005))
                ThreePointArc((213.798003088, 120.401211005), (208.798729171, 119.052452898), (207.927734777, 124.156692008))
                Line((207.927734777, 124.156692008), (199.936400139, 138.955212966))
                Line((199.936400139, 138.955212966), (203.346022961, 146.479774244))
                add(Edge.make_bspline(
                    [(223.099104635, 121.302268415), (206.486242432, 128.655244288), (203.346022961, 146.479774244)],
                    knots=[0, 0, 0, 1, 1, 1], degree=2))
            make_face()
            with Locations((210.684885935, 122.000742684)):
                Circle(SKETCH22_3_R, mode=Mode.SUBTRACT)
        extrude(amount=-BOSS_EXTRUDE10_DEPTH)


solid = part_1.part
